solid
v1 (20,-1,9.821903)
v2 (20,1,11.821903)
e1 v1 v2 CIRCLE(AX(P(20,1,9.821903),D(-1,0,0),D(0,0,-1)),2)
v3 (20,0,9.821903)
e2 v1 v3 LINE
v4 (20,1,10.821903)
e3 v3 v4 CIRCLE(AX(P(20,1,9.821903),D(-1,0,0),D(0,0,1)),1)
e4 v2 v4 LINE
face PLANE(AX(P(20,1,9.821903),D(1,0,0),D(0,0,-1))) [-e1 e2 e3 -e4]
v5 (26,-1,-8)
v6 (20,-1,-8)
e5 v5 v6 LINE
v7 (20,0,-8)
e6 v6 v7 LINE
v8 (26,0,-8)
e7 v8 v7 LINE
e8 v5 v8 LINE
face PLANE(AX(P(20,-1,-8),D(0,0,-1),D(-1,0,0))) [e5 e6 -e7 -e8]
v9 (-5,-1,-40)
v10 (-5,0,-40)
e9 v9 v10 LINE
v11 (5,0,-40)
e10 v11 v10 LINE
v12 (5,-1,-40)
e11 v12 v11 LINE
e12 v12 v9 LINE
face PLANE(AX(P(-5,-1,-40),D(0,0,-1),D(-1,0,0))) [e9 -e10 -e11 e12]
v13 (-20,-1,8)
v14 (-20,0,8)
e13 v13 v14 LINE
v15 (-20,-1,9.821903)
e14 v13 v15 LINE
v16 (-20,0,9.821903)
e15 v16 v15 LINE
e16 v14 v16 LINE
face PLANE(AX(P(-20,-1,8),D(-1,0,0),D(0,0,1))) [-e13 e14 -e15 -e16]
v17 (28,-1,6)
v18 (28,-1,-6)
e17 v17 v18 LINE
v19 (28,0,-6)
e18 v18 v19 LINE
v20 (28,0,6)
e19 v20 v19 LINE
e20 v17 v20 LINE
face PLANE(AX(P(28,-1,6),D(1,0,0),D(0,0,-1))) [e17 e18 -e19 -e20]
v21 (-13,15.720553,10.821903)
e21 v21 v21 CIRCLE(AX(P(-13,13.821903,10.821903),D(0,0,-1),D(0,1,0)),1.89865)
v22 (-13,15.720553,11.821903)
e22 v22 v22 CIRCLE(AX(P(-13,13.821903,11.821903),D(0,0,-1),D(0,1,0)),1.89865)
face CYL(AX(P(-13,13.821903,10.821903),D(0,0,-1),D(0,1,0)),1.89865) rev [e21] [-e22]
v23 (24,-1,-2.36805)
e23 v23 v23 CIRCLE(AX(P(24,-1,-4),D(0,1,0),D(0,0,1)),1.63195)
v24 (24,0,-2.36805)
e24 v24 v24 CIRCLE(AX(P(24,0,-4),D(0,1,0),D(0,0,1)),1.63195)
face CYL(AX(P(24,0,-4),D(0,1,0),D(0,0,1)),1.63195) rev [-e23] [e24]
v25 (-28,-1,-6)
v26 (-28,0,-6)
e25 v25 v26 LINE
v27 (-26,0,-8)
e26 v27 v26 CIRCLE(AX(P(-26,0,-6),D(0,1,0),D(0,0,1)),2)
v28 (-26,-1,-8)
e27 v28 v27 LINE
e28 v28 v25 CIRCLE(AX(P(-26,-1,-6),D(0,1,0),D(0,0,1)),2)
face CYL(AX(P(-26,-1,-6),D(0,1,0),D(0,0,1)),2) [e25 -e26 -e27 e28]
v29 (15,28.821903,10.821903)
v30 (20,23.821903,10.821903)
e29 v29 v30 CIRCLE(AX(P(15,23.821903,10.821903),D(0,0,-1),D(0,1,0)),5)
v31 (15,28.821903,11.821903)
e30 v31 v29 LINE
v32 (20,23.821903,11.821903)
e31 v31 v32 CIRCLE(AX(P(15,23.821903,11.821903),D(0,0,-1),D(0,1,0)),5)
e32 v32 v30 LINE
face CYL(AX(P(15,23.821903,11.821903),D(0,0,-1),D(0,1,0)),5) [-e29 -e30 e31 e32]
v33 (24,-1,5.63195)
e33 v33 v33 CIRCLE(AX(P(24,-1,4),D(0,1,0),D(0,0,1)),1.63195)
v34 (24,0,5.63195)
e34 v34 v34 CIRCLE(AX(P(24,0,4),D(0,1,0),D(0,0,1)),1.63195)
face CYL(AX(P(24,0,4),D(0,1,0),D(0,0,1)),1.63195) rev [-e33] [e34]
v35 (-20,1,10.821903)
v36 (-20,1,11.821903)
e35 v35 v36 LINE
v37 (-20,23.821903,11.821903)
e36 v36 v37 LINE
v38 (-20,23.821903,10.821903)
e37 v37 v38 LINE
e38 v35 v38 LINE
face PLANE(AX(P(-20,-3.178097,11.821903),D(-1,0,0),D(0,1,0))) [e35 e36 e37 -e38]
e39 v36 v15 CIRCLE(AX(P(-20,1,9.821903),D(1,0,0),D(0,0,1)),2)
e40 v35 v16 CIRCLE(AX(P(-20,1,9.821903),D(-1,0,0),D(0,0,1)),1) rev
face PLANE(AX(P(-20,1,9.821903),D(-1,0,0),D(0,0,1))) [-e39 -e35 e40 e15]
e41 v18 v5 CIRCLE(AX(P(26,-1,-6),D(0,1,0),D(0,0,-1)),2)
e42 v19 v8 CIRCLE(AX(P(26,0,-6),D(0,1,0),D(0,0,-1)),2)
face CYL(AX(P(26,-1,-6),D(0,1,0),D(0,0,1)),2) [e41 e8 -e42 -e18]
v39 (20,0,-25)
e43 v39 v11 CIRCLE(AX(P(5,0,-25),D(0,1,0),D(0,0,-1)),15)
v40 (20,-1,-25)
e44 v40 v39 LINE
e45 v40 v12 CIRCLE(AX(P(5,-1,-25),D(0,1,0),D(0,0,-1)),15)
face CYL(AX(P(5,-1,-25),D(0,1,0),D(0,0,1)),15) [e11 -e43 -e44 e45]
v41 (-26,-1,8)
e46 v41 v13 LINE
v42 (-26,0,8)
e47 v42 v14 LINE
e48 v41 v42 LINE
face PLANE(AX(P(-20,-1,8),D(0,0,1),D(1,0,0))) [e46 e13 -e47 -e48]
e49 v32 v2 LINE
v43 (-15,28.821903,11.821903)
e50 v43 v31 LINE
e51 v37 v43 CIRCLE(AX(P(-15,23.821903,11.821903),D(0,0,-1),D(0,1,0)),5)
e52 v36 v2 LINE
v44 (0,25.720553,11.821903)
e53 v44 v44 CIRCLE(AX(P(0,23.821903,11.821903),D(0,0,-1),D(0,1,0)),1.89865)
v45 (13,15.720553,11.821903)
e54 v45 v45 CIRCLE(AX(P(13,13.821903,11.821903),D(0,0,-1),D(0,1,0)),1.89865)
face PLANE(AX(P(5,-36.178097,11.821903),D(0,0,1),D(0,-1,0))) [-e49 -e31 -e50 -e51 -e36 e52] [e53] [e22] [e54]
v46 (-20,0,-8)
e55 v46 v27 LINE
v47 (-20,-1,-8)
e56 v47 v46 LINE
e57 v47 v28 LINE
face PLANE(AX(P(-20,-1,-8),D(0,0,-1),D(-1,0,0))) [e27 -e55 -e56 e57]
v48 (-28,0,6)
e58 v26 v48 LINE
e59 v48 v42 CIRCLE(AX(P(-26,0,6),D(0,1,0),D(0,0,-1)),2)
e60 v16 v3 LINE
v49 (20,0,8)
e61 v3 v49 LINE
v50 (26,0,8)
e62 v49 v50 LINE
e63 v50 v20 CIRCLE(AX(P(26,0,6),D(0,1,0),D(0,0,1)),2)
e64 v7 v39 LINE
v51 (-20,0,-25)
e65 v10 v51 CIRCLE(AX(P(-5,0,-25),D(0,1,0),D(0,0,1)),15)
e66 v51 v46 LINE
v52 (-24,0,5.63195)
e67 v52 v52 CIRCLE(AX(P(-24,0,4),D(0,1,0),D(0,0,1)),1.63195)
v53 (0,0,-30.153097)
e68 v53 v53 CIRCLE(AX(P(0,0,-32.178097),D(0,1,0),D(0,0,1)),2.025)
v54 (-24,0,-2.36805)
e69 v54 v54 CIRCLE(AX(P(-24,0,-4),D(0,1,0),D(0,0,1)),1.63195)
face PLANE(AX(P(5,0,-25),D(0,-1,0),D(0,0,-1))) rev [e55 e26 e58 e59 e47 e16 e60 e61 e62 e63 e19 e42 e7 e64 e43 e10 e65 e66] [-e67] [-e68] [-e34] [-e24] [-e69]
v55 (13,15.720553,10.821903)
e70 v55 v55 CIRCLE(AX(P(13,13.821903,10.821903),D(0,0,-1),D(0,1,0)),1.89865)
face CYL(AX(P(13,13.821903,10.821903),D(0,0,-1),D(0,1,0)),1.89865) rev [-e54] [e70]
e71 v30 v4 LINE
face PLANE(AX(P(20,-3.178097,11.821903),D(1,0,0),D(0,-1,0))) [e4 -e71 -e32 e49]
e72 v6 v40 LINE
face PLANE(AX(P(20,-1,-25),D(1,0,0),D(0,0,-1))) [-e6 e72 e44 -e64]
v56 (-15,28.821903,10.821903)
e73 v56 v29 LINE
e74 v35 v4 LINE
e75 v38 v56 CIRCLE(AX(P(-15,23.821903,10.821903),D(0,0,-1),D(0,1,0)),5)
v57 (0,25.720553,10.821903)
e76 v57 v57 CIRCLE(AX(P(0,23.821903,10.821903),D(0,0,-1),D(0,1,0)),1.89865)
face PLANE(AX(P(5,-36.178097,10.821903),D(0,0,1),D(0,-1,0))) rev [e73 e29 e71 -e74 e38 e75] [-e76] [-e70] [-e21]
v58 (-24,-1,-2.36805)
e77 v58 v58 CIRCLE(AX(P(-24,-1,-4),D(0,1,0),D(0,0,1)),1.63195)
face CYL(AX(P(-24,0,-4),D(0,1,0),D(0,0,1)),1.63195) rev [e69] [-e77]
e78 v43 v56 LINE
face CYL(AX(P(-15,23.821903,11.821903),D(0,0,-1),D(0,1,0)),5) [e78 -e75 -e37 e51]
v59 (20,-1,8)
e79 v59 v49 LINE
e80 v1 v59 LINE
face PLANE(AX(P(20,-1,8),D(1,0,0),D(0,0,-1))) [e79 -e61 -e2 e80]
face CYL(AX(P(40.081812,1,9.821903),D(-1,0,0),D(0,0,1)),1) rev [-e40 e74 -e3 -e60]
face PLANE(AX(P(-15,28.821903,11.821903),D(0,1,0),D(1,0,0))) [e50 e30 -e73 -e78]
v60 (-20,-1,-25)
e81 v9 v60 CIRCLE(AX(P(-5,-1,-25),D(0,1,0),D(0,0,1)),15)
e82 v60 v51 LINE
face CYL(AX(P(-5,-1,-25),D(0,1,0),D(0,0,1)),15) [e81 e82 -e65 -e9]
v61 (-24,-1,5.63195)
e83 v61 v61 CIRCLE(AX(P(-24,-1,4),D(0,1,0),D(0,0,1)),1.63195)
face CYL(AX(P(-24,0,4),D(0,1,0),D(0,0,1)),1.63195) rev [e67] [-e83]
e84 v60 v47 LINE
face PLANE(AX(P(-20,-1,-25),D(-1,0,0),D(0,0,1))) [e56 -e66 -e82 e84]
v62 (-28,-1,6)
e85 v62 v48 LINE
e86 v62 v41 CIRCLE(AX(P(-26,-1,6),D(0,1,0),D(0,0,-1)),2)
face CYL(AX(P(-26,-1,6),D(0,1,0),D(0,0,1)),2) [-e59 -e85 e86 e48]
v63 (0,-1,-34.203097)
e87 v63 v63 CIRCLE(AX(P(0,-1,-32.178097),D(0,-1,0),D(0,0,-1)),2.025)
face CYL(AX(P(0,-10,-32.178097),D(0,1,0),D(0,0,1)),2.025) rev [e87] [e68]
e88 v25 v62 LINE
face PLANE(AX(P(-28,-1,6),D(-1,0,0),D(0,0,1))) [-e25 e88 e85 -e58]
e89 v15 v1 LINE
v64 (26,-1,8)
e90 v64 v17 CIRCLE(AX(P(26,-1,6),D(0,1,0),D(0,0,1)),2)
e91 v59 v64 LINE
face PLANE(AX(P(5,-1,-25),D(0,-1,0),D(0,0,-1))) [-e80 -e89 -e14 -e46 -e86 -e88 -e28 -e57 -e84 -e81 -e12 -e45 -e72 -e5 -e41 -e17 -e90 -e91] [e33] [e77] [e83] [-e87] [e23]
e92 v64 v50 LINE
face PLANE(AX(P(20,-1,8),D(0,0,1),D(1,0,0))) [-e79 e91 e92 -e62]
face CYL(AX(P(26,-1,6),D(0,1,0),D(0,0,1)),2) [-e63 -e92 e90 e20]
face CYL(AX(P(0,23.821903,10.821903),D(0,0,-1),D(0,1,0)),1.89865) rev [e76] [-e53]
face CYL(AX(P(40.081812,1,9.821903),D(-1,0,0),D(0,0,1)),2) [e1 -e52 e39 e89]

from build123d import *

# Parameters (mm, degrees)
BASE_FLANGE1_DEPTH       = 1
SKETCHED_START           = 11.616422755
SKETCHED_BEND1_OUTLINE_W = 40
SKETCHED_BEND1_OUTLINE_H = 1
SKETCHED_BEND1_DEPTH     = 28.383577245
SKETCHED_START_2         = 10.821902755
SKETCHED_BEND1_2_DEPTH   = 0.00548
SKETCHED_START_3         = 9.821902755
SKETCHED_BEND1_3_DEPTH   = 2
SKETCHED_START_4         = -20
SKETCHED_BEND1_4_DEPTH   = 40
SKETCH7_R                = 2.025
CUT_EXTRUDE1_DEPTH       = 10
F_6_CLEARANCE_HOLE1_D    = 3.7973
F_4_CLEARANCE_HOLE2_D    = 3.2639


with BuildPart() as part:
    # Base-Flange1: sheet metal written as solids
    # Sketch1 → Base-Flange1 (new body)
    with BuildSketch(Plane(origin=(0, 0, 0), x_dir=(1, 0, 0), z_dir=(0, 1, 0))):
        with BuildLine():
            Line((-20, -8), (-20, -35))
            ThreePointArc((-20, -35), (-18.535533906, -38.535533906), (-15, -40))
            Line((-15, -40), (15, -40))
            ThreePointArc((15, -40), (18.535533906, -38.535533906), (20, -35))
            Line((20, -35), (20, -8))
            Line((20, -8), (26, -8))
            ThreePointArc((26, -8), (27.414213562, -7.414213562), (28, -6))
            Line((28, -6), (28, 6))
            ThreePointArc((28, 6), (27.414213562, 7.414213562), (26, 8))
            Line((26, 8), (20, 8))
            Line((20, 8), (20, 25))
            ThreePointArc((20, 25), (15.606601718, 35.606601718), (5, 40))
            Line((5, 40), (-5, 40))
            ThreePointArc((-5, 40), (-15.606601718, 35.606601718), (-20, 25))
            Line((-20, 25), (-20, 8))
            Line((-20, 8), (-26, 8))
            ThreePointArc((-26, 8), (-27.414213562, 7.414213562), (-28, 6))
            Line((-28, 6), (-28, -6))
            ThreePointArc((-28, -6), (-27.414213562, -7.414213562), (-26, -8))
            Line((-26, -8), (-20, -8))
        make_face()
    extrude(amount=-BASE_FLANGE1_DEPTH)

    # Sketched Bend1: read off the stored shape, not the designer's step
    # Sketched Bend1 outline → Sketched Bend1 (cut)
    with BuildSketch(Plane.XY.offset(SKETCHED_START)):
        with Locations((0, -0.5)):
            Rectangle(SKETCHED_BEND1_OUTLINE_W, SKETCHED_BEND1_OUTLINE_H)
    extrude(amount=SKETCHED_BEND1_DEPTH, mode=Mode.SUBTRACT)

    # Sketched Bend1 2 outline → Sketched Bend1 2 (add)
    with BuildSketch(Plane.XY.offset(SKETCHED_START_2)):
        with BuildLine():
            Line((20, 0), (20, 23.821902755))
            ThreePointArc((20, 23.821902755), (18.535533906, 27.357436661), (15, 28.821902755))
            Line((15, 28.821902755), (-15, 28.821902755))
            ThreePointArc((-15, 28.821902755), (-18.535533906, 27.357436661), (-20, 23.821902755))
            Line((-20, 23.821902755), (-20, 0))
            Line((-20, 0), (20, 0))
        make_face()
    extrude(amount=SKETCHED_BEND1_2_DEPTH)

    # Sketched Bend1 3 outline → Sketched Bend1 3 (add)
    with BuildSketch(Plane.XY.offset(SKETCHED_START_3)):
        with BuildLine():
            Line((20, 0), (20, 23.821902755))
            ThreePointArc((20, 23.821902755), (18.535533906, 27.357436661), (15, 28.821902755))
            Line((15, 28.821902755), (-15, 28.821902755))
            ThreePointArc((-15, 28.821902755), (-18.535533906, 27.357436661), (-20, 23.821902755))
            Line((-20, 23.821902755), (-20, 0))
            Line((-20, 0), (20, 0))
        make_face()
    extrude(amount=SKETCHED_BEND1_3_DEPTH)

    # Sketched Bend1 4 outline → Sketched Bend1 4 (cut)
    with BuildSketch(Plane.YZ.offset(SKETCHED_START_4)):
        with BuildLine():
            Line((28.821902755, 9.821902755), (28.821902755, 10.821902755))
            Line((28.821902755, 10.821902755), (1, 10.821902755))
            ThreePointArc((1, 10.821902755), (0.292893219, 10.529009536), (0, 9.821902755))
            Line((0, 9.821902755), (28.821902755, 9.821902755))
        make_face()
        with BuildLine():
            ThreePointArc((-1, 9.821902755), (-0.414213562, 11.236116317), (1, 11.821902755))
            Line((1, 11.821902755), (0, 11.821902755))
            Line((0, 11.821902755), (0, 11.616422755))
            Line((0, 11.616422755), (-1, 11.616422755))
            Line((-1, 11.616422755), (-1, 9.821902755))
        make_face()
    extrude(amount=SKETCHED_BEND1_4_DEPTH, mode=Mode.SUBTRACT)

    # Sketch7 → Cut-Extrude1 (cut)
    with BuildSketch(Plane(origin=(0, 0, 0), x_dir=(1, 0, 0), z_dir=(0, 1, 0))):
        with Locations(Location((0, 32.178097245, 0), (0, 0, 270))):
            Circle(SKETCH7_R)
    extrude(amount=-CUT_EXTRUDE1_DEPTH, mode=Mode.SUBTRACT)

    # #6 Clearance Hole1 (through all)
    with Locations(Plane(origin=(0, 0, 10.821902755), x_dir=(-1, 0, 0), z_dir=(0, 0, -1))):
        with Locations((13, 13.821902755), (-13, 13.821902755), (0, 23.821902755)):
            Hole(F_6_CLEARANCE_HOLE1_D / 2)

    # #4 Clearance Hole2 (through all)
    with Locations(Plane(origin=(0, 0, 0), x_dir=(1, 0, 0), z_dir=(0, 1, 0))):
        with Locations((-24, 4), (-24, -4), (24, 4), (24, -4)):
            Hole(F_4_CLEARANCE_HOLE2_D / 2)


solid = part.part
